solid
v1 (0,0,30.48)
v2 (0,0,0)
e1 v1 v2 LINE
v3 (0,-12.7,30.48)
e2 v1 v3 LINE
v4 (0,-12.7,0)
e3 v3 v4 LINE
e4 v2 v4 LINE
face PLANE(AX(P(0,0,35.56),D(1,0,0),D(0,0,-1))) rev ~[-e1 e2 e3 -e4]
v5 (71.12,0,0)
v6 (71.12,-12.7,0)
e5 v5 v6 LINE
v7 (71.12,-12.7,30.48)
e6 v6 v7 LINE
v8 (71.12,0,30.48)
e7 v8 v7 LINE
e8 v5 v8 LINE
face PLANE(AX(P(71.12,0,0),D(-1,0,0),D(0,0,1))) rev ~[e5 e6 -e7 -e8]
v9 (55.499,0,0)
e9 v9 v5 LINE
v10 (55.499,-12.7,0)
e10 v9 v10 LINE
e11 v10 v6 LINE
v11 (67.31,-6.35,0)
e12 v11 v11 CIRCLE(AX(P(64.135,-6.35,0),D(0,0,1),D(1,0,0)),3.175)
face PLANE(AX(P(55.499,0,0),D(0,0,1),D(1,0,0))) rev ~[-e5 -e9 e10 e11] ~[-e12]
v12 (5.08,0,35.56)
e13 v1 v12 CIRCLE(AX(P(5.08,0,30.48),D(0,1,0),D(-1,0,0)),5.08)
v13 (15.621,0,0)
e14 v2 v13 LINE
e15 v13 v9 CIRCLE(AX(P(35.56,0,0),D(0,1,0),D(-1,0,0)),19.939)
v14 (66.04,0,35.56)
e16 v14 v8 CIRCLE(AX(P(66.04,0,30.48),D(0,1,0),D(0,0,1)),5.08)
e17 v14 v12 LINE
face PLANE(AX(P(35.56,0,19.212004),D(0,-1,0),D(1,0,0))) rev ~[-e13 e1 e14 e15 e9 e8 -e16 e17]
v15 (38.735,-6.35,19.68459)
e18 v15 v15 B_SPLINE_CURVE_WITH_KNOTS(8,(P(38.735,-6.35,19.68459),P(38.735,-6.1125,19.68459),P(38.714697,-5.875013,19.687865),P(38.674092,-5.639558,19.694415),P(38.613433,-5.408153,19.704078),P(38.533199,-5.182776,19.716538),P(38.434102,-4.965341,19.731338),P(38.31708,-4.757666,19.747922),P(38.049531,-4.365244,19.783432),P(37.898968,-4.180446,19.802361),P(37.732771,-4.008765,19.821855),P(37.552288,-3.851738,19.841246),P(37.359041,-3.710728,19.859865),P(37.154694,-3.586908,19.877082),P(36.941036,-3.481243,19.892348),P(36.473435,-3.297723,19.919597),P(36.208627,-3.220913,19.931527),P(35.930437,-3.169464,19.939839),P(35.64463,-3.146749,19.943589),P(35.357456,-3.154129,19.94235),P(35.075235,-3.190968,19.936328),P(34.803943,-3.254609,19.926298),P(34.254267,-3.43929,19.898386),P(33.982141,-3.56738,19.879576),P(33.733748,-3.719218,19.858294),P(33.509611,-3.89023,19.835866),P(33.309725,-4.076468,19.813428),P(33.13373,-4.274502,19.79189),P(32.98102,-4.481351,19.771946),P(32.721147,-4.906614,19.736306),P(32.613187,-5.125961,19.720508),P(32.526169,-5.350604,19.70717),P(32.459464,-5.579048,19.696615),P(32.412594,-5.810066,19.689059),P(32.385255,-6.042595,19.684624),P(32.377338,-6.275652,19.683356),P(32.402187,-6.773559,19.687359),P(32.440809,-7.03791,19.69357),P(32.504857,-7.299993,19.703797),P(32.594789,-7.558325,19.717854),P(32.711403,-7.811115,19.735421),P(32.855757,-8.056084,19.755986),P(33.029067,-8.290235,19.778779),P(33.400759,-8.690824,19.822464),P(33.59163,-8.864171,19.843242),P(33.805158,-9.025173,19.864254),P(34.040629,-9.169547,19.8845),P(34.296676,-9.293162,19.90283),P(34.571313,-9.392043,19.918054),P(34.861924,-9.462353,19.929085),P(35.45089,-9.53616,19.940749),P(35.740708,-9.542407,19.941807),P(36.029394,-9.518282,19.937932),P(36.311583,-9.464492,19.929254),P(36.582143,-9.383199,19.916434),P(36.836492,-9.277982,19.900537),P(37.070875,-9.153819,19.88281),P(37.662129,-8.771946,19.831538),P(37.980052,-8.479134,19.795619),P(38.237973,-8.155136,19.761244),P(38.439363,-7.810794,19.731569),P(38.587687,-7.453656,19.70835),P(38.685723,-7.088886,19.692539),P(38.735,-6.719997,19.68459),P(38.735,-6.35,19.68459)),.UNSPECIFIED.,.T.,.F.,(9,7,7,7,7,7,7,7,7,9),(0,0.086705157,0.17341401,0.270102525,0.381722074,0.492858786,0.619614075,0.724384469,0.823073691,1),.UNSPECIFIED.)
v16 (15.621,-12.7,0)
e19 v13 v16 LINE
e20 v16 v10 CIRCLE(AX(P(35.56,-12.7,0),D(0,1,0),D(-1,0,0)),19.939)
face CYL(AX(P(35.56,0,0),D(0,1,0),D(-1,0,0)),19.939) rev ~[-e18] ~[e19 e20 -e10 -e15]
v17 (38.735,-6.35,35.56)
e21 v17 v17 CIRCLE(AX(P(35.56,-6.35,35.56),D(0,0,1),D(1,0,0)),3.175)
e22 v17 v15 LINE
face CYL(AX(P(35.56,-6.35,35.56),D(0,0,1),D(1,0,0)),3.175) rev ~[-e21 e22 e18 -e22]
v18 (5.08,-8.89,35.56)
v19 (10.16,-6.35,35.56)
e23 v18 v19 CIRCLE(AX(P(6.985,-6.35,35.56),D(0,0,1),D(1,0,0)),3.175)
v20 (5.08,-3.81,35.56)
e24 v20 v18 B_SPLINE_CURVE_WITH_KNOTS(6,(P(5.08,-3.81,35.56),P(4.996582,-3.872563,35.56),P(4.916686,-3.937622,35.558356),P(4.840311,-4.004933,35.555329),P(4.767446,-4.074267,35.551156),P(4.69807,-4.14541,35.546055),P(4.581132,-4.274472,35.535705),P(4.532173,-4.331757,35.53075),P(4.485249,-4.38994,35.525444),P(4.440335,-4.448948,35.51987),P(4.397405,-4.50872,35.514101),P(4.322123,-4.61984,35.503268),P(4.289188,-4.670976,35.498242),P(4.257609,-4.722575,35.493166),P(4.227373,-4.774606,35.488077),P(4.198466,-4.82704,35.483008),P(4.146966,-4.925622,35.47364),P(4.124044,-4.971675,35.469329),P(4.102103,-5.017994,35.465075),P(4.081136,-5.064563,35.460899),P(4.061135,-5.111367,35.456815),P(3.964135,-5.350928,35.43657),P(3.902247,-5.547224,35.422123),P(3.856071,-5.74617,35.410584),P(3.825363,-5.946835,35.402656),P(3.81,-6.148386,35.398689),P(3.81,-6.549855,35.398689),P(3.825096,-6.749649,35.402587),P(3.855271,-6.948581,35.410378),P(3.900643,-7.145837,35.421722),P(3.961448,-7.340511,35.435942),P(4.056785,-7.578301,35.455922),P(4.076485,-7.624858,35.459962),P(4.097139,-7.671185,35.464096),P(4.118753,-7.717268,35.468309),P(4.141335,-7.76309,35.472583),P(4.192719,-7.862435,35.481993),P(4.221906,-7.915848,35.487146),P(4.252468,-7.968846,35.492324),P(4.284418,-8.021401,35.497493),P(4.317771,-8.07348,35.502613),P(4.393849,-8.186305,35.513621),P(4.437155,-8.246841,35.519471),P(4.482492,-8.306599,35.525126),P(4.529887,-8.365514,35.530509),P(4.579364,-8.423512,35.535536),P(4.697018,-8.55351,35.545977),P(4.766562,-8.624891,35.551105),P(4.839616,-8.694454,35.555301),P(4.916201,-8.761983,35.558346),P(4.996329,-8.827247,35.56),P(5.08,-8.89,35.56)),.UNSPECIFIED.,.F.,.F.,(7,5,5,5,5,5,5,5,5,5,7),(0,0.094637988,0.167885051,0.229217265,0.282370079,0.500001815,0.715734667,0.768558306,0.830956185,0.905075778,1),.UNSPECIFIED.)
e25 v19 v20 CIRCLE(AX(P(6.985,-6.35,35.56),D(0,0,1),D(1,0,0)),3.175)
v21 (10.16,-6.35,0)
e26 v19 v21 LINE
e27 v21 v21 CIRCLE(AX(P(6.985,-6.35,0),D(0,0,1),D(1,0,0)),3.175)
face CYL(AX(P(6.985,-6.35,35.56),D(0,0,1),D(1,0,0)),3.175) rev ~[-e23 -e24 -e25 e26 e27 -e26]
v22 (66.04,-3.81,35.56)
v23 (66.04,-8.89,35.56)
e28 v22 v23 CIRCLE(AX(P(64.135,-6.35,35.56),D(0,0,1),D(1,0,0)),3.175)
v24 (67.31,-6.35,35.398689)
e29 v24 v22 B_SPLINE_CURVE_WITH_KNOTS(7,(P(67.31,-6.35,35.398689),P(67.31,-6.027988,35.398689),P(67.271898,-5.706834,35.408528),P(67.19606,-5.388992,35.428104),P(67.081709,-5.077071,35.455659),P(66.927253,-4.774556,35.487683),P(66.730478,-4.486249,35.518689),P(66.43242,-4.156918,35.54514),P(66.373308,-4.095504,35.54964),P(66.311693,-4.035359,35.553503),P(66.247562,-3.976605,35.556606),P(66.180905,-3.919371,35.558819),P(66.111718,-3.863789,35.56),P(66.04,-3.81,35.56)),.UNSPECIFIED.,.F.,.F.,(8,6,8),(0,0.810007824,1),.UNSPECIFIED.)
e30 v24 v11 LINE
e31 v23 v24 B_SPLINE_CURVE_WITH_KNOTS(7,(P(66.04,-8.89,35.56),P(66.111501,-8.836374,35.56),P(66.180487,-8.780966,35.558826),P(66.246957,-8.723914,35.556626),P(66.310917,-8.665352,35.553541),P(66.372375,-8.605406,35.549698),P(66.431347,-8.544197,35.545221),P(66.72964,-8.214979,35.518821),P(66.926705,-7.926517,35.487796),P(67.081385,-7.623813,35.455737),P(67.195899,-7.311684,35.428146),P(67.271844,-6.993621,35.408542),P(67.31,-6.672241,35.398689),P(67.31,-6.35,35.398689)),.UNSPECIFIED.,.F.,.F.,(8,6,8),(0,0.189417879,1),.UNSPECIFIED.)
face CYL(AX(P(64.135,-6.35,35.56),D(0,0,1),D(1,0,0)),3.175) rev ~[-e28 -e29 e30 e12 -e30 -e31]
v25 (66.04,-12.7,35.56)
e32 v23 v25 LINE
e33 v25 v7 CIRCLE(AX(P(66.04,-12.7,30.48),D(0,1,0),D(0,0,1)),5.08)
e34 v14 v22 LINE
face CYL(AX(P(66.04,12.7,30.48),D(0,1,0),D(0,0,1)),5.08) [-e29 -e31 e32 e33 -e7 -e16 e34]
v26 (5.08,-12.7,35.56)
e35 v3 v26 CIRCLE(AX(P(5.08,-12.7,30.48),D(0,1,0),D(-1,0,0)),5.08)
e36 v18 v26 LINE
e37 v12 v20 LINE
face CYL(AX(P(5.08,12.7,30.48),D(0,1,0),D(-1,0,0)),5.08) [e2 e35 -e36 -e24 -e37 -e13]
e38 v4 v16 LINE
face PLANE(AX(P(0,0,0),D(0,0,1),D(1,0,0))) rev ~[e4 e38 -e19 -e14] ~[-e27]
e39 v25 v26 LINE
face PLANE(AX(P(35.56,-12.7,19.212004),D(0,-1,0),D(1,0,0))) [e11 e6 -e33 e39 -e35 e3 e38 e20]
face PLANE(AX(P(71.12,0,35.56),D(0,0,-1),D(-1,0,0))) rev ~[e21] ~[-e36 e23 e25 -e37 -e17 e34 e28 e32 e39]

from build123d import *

# Parameters (mm, degrees)
F1_DEPTH    = 12.7
F2_R        = 3.175
F3_DEPTH    = 35.561
F4_R        = 3.175
F5_DEPTH    = 15.8764097817
F6_T1_DEPTH = 38.1


# Not quite as in the source:
# - a fillet or chamfer that OpenCascade refuses, or shapes differently, is made with other operations: its cross-section is extruded or revolved along the edge and cut away or added


with BuildPart() as f1:
    # F0 (on Front) → F1 (new body)
    with BuildSketch(Plane.XZ):
        with BuildLine():
            Line((0, 35.56), (0, 0))
            Line((0, 0), (15.621, 0))
            ThreePointArc((15.621, 0), (35.56, 19.939), (55.499, 0))
            Line((55.499, 0), (71.12, 0))
            Line((71.12, 0), (71.12, 35.56))
            Line((71.12, 35.56), (0, 35.56))
        make_face()
    extrude(amount=F1_DEPTH)

    # F2 (on face) → F3 (cut, through all)
    with BuildSketch(Plane.XY.offset(35.56)):
        with Locations((6.985, -6.35)):
            Circle(F2_R)
        with Locations((64.135, -6.35)):
            Circle(F2_R)
    extrude(amount=-F3_DEPTH, mode=Mode.SUBTRACT)

    # F4 (on face) → F5 (cut, through all)
    with BuildSketch(Plane.XY.offset(35.56)):
        with Locations((35.56, -6.35)):
            Circle(F4_R)
    extrude(amount=-F5_DEPTH, mode=Mode.SUBTRACT)

    # F6: fillet of radius 5.08 on 2 edges, made by hand

    # F6_s2 → F6_t1 (cut)
    with BuildSketch(Plane.XZ.offset(-12.7)):
        with BuildLine():
            ThreePointArc((0, 30.48), (1.4878975516, 34.0721024484), (5.08, 35.56))
            Line((5.08, 35.56), (0, 35.56))
            Line((0, 35.56), (0, 30.48))
        make_face()
        with BuildLine():
            ThreePointArc((66.04, 35.56), (69.6321024484, 34.0721024484), (71.12, 30.48))
            Line((71.12, 30.48), (71.12, 35.56))
            Line((71.12, 35.56), (66.04, 35.56))
        make_face()
    extrude(amount=F6_T1_DEPTH, mode=Mode.SUBTRACT)


solid = f1.part
